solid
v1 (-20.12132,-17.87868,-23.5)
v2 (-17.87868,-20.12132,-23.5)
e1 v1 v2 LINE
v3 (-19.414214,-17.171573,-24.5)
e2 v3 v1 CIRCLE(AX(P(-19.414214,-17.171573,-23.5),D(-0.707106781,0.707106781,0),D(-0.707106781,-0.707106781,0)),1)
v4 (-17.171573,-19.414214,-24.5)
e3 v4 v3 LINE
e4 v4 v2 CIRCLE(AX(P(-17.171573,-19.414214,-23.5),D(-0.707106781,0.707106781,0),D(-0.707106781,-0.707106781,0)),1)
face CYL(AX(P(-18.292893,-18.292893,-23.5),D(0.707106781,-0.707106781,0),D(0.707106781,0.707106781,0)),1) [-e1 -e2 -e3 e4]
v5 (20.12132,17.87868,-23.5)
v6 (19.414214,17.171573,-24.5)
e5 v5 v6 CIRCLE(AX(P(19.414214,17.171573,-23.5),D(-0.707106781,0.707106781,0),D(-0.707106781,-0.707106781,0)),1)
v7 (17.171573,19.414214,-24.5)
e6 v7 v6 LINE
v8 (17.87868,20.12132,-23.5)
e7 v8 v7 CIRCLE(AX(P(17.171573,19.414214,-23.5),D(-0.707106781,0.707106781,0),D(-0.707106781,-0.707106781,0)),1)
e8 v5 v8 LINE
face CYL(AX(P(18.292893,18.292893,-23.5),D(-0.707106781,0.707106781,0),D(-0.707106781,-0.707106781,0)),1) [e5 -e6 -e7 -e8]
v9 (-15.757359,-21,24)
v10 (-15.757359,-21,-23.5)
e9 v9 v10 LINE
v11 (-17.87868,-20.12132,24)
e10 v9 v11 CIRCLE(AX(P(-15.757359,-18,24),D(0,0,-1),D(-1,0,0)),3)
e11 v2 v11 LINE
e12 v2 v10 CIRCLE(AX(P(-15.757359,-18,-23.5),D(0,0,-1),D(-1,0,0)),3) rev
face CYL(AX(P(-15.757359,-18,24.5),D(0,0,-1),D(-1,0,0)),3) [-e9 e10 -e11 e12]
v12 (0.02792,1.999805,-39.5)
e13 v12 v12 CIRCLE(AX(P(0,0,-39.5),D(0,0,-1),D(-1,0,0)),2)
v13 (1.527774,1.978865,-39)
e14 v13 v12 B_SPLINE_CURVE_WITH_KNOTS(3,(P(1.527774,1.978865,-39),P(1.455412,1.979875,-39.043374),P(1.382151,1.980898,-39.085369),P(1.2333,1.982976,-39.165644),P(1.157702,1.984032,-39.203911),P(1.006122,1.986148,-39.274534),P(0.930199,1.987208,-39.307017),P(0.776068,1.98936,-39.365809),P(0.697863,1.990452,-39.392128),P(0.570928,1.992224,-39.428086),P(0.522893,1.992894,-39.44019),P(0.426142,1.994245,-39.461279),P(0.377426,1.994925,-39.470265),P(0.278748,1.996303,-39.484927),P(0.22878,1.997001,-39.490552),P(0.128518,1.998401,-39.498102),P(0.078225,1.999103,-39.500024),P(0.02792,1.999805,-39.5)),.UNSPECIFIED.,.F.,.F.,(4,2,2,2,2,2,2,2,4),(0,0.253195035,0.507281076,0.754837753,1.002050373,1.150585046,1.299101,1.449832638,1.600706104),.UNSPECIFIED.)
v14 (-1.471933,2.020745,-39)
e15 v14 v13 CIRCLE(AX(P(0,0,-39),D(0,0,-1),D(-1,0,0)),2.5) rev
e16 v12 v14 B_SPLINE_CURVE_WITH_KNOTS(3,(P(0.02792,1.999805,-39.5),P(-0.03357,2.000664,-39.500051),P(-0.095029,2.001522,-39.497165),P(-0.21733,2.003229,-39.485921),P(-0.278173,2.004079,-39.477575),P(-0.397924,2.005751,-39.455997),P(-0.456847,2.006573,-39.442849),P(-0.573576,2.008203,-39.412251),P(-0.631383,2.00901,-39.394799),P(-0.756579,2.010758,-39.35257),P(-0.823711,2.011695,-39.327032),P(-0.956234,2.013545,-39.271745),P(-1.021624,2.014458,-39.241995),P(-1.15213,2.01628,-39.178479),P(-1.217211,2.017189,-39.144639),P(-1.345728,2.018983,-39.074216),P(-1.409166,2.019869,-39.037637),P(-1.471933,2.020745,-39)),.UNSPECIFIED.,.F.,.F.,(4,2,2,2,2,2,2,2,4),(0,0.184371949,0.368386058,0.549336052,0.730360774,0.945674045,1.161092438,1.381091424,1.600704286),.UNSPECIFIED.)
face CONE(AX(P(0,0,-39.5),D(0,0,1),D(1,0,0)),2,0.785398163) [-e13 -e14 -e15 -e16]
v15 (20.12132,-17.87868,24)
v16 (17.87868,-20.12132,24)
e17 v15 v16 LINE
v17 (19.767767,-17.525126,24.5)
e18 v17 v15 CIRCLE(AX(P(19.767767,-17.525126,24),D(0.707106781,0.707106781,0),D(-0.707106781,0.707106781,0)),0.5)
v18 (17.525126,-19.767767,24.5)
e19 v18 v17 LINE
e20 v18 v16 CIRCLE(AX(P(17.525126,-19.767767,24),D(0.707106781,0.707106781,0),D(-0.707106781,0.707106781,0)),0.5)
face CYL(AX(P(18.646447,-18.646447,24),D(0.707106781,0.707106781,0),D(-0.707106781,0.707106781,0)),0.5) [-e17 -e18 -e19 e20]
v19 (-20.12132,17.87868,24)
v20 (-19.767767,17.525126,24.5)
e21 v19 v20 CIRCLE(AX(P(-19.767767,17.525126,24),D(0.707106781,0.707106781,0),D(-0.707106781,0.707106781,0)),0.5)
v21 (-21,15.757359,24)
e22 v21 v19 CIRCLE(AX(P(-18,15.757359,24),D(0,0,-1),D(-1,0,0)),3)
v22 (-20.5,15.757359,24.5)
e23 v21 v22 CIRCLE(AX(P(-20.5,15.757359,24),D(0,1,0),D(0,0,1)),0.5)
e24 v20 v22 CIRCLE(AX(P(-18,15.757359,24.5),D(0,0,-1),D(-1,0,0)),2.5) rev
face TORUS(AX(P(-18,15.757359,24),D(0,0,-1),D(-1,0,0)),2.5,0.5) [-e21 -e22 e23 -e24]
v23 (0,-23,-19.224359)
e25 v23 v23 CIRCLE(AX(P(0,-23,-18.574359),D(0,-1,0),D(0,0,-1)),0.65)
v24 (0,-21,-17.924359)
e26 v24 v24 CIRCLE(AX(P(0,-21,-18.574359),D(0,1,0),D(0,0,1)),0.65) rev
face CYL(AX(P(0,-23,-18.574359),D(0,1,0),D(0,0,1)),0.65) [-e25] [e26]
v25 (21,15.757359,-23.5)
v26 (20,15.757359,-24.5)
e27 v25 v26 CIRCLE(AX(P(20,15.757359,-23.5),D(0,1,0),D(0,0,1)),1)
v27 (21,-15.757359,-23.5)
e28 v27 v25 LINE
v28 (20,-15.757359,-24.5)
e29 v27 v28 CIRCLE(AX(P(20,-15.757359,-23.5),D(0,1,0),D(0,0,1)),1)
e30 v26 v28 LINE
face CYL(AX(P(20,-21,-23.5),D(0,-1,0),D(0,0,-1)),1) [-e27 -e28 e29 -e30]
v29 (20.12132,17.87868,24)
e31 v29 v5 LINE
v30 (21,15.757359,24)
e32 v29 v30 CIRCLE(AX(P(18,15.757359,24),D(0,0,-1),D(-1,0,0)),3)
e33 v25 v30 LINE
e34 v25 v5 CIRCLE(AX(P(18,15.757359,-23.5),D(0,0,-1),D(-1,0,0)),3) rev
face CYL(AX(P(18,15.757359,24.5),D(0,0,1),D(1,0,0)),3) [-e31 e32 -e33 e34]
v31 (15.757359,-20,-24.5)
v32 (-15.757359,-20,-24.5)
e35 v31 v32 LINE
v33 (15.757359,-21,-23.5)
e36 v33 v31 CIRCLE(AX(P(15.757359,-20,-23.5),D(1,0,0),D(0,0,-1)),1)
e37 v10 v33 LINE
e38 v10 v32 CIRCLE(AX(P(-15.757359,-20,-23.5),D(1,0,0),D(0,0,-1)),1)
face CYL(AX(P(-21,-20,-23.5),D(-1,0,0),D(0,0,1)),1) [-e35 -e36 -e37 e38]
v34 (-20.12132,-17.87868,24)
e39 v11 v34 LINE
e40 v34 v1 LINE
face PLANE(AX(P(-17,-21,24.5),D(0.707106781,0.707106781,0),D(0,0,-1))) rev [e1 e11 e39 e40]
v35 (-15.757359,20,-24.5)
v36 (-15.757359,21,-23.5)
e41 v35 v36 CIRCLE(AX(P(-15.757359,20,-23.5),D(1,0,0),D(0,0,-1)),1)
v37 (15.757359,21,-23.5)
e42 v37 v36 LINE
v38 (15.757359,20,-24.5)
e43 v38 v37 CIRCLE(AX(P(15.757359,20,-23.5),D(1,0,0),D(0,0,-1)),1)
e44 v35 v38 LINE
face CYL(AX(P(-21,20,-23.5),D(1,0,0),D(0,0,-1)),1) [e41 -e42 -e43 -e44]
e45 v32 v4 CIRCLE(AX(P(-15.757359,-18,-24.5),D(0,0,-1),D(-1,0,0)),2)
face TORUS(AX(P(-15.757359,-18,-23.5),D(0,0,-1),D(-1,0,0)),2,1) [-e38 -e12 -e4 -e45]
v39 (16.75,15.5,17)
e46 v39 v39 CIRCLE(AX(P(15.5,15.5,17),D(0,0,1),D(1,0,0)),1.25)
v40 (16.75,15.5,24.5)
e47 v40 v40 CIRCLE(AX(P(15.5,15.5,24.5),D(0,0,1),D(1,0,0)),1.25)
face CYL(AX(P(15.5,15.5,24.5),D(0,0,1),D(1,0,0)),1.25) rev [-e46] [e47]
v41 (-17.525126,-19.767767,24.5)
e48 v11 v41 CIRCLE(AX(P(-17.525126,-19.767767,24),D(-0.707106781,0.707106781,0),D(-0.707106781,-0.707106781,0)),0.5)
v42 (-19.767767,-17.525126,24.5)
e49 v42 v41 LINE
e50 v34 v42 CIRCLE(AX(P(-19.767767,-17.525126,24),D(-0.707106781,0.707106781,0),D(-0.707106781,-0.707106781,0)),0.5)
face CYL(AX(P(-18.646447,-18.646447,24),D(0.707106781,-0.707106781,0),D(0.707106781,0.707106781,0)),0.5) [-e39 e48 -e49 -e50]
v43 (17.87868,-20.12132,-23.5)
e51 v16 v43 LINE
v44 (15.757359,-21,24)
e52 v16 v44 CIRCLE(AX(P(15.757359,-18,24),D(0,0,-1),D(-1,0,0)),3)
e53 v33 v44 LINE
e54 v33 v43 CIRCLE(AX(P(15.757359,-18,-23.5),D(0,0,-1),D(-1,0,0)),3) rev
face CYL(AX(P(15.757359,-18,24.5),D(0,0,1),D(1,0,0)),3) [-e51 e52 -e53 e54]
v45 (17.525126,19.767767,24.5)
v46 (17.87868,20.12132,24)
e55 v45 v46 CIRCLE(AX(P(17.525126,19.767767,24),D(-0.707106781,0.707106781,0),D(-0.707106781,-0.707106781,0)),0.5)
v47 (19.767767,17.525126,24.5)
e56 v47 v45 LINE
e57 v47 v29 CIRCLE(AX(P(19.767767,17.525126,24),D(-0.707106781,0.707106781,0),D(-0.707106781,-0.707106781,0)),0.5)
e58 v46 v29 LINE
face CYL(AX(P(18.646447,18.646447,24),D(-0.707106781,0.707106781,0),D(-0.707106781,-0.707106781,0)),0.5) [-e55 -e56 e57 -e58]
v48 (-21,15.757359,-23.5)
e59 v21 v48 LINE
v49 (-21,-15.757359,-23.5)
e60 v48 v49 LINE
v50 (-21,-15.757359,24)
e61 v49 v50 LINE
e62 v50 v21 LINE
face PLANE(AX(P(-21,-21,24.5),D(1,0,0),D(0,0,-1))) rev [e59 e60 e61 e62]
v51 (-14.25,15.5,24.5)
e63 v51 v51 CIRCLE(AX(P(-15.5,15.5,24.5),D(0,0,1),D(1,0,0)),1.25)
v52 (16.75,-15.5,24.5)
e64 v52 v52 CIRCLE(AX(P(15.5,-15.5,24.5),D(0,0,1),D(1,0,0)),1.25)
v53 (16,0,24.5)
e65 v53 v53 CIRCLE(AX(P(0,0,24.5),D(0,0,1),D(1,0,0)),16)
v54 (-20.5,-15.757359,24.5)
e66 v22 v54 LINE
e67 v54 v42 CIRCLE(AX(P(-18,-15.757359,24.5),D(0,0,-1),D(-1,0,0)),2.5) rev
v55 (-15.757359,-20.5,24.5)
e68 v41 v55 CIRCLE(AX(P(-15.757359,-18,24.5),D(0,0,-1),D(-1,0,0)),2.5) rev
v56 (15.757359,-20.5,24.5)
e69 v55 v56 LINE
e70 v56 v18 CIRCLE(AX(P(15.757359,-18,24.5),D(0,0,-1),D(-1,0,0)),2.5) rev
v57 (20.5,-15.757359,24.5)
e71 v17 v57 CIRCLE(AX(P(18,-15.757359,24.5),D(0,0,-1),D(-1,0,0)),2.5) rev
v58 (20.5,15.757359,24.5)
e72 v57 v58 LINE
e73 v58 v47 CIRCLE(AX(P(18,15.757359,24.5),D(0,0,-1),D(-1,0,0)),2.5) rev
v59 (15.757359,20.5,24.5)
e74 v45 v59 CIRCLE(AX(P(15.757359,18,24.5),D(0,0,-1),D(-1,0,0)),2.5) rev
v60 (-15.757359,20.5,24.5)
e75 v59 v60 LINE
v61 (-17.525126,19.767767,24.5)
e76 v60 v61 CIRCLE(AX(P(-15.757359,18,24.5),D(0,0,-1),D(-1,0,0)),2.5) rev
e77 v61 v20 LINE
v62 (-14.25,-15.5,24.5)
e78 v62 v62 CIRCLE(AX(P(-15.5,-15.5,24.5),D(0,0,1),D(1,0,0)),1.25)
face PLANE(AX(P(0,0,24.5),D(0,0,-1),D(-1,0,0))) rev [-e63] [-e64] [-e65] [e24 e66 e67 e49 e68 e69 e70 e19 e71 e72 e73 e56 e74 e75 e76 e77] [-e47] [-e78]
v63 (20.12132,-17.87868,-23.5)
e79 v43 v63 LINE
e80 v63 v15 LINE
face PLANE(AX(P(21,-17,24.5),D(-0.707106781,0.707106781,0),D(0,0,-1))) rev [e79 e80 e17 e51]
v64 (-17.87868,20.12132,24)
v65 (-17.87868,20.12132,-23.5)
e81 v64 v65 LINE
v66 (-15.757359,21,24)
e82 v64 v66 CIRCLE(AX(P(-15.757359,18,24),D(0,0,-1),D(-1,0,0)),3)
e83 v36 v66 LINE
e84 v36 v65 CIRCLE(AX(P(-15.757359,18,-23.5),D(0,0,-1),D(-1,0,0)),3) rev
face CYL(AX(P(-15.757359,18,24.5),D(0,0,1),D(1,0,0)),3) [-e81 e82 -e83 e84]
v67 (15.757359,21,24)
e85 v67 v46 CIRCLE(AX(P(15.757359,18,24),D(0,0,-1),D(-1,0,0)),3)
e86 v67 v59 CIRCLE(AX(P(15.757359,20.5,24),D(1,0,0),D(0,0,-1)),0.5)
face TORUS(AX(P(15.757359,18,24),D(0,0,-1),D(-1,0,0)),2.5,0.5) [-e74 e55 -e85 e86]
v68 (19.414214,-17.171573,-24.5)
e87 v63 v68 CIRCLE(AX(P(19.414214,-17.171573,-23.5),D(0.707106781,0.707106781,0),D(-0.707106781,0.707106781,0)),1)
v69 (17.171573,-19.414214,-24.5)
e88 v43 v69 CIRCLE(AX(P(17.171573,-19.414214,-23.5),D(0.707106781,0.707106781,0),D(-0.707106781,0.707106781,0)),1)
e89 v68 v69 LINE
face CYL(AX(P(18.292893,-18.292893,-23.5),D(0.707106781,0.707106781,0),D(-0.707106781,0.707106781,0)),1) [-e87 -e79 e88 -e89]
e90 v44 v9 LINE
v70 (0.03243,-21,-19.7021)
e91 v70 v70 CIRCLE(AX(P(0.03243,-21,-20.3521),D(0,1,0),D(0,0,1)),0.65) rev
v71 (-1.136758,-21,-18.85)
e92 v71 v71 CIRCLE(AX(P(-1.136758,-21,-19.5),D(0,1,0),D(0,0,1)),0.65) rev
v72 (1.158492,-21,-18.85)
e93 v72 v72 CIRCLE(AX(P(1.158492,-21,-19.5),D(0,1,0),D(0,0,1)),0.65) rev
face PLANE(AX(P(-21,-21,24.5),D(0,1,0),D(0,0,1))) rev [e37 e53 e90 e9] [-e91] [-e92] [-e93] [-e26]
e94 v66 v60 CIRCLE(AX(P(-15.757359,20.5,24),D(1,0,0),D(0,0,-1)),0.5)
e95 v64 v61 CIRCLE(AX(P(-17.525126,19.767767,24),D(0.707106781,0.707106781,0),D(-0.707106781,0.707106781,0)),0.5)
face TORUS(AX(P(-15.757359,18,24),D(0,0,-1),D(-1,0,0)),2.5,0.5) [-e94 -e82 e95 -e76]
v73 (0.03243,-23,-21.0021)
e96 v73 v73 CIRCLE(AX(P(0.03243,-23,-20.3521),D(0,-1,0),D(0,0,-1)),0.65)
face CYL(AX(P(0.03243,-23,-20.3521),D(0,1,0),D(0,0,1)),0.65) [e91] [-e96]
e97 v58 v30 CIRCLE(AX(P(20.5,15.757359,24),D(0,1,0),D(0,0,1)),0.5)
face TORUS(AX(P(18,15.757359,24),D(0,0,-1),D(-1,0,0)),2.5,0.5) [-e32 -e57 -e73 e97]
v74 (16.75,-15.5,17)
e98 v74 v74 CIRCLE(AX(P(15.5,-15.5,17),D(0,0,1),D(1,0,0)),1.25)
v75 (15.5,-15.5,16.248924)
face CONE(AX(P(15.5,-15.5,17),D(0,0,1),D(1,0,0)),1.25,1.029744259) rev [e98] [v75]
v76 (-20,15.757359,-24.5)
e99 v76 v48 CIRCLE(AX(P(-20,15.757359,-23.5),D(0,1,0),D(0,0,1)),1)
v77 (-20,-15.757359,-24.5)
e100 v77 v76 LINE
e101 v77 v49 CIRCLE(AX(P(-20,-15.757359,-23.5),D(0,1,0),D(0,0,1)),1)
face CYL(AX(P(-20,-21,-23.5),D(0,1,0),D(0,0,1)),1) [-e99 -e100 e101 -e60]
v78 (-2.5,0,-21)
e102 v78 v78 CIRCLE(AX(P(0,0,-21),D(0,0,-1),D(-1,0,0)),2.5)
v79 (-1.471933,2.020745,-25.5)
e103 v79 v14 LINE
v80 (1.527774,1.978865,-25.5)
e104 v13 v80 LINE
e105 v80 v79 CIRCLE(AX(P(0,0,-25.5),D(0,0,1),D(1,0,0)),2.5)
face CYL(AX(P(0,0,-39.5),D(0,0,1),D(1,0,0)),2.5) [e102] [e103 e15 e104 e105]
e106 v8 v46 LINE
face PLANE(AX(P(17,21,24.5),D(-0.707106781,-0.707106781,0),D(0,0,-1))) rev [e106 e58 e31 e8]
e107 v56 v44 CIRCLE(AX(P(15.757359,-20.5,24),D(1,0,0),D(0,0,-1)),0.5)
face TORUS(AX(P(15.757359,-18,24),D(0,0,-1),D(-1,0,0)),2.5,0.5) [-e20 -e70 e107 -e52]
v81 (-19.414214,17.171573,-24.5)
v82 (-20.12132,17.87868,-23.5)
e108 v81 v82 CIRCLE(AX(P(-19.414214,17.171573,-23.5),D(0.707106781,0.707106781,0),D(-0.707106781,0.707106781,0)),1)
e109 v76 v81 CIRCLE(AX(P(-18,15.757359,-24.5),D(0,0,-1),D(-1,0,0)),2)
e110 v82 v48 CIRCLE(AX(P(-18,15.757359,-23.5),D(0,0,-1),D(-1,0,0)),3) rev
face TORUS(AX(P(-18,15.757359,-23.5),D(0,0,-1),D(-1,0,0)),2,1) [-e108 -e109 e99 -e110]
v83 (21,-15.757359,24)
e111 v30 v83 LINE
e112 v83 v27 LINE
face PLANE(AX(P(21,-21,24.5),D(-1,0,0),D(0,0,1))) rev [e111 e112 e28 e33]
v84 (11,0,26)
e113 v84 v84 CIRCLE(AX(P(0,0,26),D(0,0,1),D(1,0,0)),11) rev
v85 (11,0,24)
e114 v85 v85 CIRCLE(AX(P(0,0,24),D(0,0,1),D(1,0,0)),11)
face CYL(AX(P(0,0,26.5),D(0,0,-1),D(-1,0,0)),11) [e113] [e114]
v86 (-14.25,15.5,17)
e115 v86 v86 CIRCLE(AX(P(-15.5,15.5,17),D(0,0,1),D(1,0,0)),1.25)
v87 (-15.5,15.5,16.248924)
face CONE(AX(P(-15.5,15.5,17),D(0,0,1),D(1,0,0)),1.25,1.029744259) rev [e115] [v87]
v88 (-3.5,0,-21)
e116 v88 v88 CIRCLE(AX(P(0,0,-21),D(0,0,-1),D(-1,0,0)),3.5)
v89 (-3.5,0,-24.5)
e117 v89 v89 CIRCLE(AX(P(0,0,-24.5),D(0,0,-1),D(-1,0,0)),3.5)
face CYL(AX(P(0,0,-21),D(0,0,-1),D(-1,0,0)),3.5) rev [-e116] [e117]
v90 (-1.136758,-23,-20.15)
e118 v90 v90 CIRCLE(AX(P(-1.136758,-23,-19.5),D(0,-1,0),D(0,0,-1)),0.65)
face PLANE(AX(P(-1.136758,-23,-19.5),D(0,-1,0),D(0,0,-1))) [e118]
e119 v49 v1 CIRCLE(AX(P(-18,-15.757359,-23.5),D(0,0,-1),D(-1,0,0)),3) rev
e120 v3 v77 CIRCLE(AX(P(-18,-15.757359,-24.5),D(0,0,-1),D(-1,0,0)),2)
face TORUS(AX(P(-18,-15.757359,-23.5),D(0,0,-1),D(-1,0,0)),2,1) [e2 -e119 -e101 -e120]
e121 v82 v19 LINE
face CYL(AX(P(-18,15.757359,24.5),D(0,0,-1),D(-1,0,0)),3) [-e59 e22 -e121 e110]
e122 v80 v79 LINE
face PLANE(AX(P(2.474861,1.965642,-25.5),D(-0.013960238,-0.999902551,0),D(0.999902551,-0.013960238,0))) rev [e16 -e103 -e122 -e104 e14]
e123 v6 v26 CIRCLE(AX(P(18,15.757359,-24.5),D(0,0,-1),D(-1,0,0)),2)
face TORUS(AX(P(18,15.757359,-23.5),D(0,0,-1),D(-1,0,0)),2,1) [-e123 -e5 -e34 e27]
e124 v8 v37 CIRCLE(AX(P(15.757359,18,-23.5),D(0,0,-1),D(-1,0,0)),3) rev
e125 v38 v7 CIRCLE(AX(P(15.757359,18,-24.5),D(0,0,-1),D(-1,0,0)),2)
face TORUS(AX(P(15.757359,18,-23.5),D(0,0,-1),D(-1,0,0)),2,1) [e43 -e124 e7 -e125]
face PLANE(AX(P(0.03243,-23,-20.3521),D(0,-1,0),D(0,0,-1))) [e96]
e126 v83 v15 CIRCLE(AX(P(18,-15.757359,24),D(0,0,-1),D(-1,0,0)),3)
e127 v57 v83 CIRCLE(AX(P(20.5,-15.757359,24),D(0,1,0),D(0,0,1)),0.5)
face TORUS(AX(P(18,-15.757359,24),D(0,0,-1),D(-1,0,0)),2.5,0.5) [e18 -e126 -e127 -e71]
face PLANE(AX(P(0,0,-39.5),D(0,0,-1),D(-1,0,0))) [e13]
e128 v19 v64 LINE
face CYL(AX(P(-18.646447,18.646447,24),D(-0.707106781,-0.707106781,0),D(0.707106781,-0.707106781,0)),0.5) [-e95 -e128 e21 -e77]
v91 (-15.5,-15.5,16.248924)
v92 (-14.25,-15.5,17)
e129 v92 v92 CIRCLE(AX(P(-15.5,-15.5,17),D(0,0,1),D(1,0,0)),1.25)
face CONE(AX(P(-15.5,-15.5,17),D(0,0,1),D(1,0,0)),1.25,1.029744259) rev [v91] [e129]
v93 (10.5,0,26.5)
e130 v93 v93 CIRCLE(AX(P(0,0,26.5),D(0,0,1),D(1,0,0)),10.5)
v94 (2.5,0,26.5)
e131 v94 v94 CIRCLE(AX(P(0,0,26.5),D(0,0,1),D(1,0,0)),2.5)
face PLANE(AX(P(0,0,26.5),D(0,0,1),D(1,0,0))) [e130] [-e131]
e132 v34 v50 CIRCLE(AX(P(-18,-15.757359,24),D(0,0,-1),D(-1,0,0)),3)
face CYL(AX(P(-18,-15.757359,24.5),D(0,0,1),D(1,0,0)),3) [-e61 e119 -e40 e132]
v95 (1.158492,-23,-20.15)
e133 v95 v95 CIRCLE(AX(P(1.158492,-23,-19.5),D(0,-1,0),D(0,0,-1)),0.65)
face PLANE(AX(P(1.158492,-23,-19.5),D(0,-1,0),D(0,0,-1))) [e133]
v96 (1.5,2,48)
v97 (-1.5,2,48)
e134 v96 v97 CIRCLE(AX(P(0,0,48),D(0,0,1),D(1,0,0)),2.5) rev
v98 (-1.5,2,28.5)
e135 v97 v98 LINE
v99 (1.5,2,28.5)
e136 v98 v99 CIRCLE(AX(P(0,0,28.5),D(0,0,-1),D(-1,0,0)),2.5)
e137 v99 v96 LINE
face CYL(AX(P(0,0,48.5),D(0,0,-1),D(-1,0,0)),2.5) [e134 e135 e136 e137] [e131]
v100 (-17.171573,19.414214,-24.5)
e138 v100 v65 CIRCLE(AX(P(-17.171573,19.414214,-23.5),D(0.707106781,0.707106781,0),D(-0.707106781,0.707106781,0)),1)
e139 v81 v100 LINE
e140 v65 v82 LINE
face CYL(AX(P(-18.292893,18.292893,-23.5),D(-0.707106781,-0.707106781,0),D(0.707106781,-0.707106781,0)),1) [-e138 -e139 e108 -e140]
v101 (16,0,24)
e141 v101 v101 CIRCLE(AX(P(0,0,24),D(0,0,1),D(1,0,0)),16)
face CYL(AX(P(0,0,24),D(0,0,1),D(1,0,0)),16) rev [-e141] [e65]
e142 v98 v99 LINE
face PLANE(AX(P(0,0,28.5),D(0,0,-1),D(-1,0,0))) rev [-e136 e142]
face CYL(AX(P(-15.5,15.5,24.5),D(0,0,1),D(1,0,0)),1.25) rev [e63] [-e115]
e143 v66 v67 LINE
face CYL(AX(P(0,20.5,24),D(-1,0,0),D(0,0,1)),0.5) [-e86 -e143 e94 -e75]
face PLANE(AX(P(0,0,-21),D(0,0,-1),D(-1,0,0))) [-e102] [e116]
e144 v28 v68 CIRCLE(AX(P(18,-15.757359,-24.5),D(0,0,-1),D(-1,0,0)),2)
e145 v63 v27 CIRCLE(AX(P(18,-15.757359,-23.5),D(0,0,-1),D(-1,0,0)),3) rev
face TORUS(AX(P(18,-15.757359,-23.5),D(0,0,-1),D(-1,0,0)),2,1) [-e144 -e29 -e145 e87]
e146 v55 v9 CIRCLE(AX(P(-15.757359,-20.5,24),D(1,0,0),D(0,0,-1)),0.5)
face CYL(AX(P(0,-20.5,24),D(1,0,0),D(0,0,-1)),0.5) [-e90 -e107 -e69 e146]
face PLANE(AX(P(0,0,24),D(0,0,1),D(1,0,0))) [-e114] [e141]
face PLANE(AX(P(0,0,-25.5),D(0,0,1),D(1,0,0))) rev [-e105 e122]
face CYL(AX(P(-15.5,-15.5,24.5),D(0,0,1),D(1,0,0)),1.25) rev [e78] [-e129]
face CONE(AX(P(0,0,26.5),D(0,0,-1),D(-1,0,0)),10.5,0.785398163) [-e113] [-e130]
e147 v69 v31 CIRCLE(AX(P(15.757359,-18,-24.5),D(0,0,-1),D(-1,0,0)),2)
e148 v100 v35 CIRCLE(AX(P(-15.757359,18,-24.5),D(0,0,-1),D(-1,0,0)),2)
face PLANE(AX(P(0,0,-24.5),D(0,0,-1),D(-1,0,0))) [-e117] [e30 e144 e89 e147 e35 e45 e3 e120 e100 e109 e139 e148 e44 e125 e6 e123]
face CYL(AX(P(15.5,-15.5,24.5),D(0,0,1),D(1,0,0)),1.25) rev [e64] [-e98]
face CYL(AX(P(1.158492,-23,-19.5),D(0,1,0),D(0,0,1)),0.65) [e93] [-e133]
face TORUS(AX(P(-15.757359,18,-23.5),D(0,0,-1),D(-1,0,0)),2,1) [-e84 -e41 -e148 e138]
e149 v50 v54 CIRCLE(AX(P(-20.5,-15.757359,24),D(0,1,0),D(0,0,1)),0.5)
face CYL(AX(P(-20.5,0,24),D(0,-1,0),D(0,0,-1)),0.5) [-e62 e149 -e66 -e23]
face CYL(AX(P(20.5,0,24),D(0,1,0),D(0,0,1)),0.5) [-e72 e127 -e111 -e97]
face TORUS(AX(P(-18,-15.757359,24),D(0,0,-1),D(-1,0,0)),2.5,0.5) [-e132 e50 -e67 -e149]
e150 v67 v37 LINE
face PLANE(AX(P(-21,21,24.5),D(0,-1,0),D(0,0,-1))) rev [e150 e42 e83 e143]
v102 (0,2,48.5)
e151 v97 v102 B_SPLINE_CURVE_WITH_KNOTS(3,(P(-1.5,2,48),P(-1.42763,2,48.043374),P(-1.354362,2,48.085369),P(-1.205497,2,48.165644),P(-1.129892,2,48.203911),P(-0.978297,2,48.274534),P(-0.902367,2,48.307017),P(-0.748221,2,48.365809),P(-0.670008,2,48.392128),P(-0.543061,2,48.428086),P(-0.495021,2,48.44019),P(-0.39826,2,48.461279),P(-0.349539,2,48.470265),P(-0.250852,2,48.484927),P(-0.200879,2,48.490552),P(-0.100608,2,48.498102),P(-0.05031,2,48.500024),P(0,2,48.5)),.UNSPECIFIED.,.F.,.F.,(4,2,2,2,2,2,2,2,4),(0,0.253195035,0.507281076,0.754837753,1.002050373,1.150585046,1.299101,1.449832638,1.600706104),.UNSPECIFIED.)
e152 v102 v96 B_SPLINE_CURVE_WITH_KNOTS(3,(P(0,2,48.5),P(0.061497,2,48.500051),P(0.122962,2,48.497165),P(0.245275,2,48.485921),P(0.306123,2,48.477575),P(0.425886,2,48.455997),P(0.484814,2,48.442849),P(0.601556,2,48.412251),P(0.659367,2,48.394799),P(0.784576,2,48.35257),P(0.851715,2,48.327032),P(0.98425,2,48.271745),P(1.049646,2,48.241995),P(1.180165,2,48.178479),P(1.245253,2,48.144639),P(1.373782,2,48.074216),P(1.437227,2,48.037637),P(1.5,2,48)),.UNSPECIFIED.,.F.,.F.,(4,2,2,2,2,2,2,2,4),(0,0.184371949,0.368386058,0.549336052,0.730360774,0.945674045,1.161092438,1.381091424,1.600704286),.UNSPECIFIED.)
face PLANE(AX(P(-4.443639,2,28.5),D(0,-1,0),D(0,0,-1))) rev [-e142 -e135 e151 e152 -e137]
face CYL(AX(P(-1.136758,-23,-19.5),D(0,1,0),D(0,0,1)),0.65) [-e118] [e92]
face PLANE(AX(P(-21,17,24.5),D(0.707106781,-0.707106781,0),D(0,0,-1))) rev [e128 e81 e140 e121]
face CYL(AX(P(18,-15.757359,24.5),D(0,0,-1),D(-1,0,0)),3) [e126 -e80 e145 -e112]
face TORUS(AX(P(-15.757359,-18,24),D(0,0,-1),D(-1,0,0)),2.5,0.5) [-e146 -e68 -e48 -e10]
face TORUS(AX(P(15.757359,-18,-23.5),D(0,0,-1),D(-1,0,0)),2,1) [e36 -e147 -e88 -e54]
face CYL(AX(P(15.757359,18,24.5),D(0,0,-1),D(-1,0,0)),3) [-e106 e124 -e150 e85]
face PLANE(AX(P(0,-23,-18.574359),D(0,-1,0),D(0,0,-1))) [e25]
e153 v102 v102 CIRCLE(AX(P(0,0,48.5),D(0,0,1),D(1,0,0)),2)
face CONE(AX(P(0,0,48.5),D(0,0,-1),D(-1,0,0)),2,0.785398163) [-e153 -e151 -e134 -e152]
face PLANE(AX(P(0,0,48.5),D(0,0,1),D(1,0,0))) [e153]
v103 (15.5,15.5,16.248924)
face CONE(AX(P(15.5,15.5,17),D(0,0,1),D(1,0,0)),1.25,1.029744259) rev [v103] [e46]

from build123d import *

# Parameters (mm, degrees)
SKETCH1_W           = 42
SKETCH1_H           = 42
BOSS_EXTRUDE1_DEPTH = 24.5
CHAMFER1_SIZE       = 4
SKETCH2_R           = 11
BOSS_EXTRUDE2_DEPTH = 2
CUT_EXTRUDE1_START  = -0.5
SKETCH3_R           = 16
SKETCH3_R_2         = 11
CUT_EXTRUDE1_DEPTH  = 0.5
SKETCH4_R           = 2.5
BOSS_EXTRUDE3_DEPTH = 22
SKETCH5_W           = 10.364275964
SKETCH5_H           = 1.526028363
CUT_EXTRUDE2_DEPTH  = 20
CIRPATTERN1_COUNT   = 4
FILLET1_R           = 3
CHAMFER2_SIZE       = 0.5
FILLET2_R           = 1
FILLET3_R           = 0.5
SKETCH8_R           = 0.65
BOSS_EXTRUDE4_DEPTH = 2
SKETCH9_R           = 3.5
CUT_EXTRUDE3_DEPTH  = 3.5
BOSS_EXTRUDE5_START = 18.5
SKETCH10_R          = 2.5
BOSS_EXTRUDE5_DEPTH = 18.5
CUT_EXTRUDE4_DEPTH  = 14
CHAMFER3_SIZE       = 0.5


with BuildPart() as part:
    # Sketch1 → Boss-Extrude1 (new, symmetric)
    with BuildSketch(Plane.XY):
        Rectangle(SKETCH1_W, SKETCH1_H)
    extrude(amount=BOSS_EXTRUDE1_DEPTH, both=True)

    # Chamfer1
    chamfer1_edges = [part.edges().sort_by_distance(p)[0] for p in [
        (21, -21, 0),
        (-21, -21, 0),
        (-21, 21, 0),
        (21, 21, 0),
    ]]
    chamfer(chamfer1_edges, length=CHAMFER1_SIZE)

    # Sketch2 → Boss-Extrude2 (add)
    with BuildSketch(Plane.XY.offset(24.5)):
        with Locations(Location((0, 0, 0), (0, 0, 180))):
            Circle(SKETCH2_R)
    extrude(amount=BOSS_EXTRUDE2_DEPTH)

    # Sketch3 → Cut-Extrude1 (cut)
    with BuildSketch(Plane.XY.offset(24.5).offset(CUT_EXTRUDE1_START)):
        Circle(SKETCH3_R)
        Circle(SKETCH3_R_2, mode=Mode.SUBTRACT)
    extrude(amount=CUT_EXTRUDE1_DEPTH, mode=Mode.SUBTRACT)

    # Sketch4 → Boss-Extrude3 (add)
    with BuildSketch(Plane.XY.offset(26.5)):
        Circle(SKETCH4_R)
    extrude(amount=BOSS_EXTRUDE3_DEPTH)

    # Sketch5 → Cut-Extrude2 (cut)
    with BuildSketch(Plane.XY.offset(48.5)):
        with Locations((0.738499094, 2.763014181)):
            Rectangle(SKETCH5_W, SKETCH5_H)
    extrude(amount=-CUT_EXTRUDE2_DEPTH, mode=Mode.SUBTRACT)

    # Sketch7 → M3x0.5 Tapped Hole1 (revolve, cut)
    with BuildSketch(Plane(origin=(-15.5, 15.5, 24.5), x_dir=(0, -1, 0), z_dir=(1, 0, 0))):
        Polygon((0, 0), (0, 8.251075774), (1.25, 7.5), (1.25, 0), align=None)
    m3x0_5_tapped_hole1 = revolve(axis=Axis((-15.5, 15.5, 30.85), (0, 0, -1)), mode=Mode.SUBTRACT)

    # CirPattern1: M3x0.5 Tapped Hole1 ×4 about axis
    cirpattern1_axis = Axis((0, 0, 0), (0, 0, 1))
    for i in range(1, CIRPATTERN1_COUNT):
        add(m3x0_5_tapped_hole1.rotate(cirpattern1_axis, i * 360 / CIRPATTERN1_COUNT), mode=Mode.SUBTRACT)

    # Fillet1
    fillet1_edges = [part.edges().sort_by_distance(p)[0] for p in [
        (17, -21, 0),
        (-17, -21, 0),
        (-21, 17, 0),
        (-21, -17, 0),
        (21, 17, 0),
        (21, -17, 0),
        (17, 21, 0),
        (-17, 21, 0),
    ]]
    fillet(fillet1_edges, radius=FILLET1_R)

    # Chamfer2
    chamfer2_edges = [part.edges().sort_by_distance(p)[0] for p in [
        (-1.118033989, -2.236067977, 48.5),
        (11, 0, 26.5),
    ]]
    chamfer(chamfer2_edges, length=CHAMFER2_SIZE - 0.0001)  # a hair under: the kernel refuses the full size

    # Fillet2
    fillet2_edges = [part.edges().sort_by_distance(p)[0] for p in [
        (-19, -19, -24.5),
        (0, -21, -24.5),
        (-19, 19, -24.5),
        (0, 21, -24.5),
        (19, 19, -24.5),
        (21, 0, -24.5),
        (19, -19, -24.5),
        (-16.90540961, 20.771638598, -24.5),
        (-20.771638598, 16.90540961, -24.5),
        (16.90540961, 20.771638598, -24.5),
        (20.771638598, 16.90540961, -24.5),
        (20.771638598, -16.90540961, -24.5),
        (16.90540961, -20.771638598, -24.5),
        (-16.90540961, -20.771638598, -24.5),
        (-20.771638598, -16.90540961, -24.5),
        (-21, 0, -24.5),
    ]]
    fillet(fillet2_edges, radius=FILLET2_R)

    # Fillet3
    fillet3_edges = [part.edges().sort_by_distance(p)[0] for p in [
        (-16.90540961, 20.771638598, 24.5),
        (-20.771638598, 16.90540961, 24.5),
        (16.90540961, 20.771638598, 24.5),
        (20.771638598, 16.90540961, 24.5),
        (20.771638598, -16.90540961, 24.5),
        (16.90540961, -20.771638598, 24.5),
        (-16.90540961, -20.771638598, 24.5),
        (-20.771638598, -16.90540961, 24.5),
        (-21, 0, 24.5),
        (-19, -19, 24.5),
        (0, -21, 24.5),
        (19, -19, 24.5),
        (21, 0, 24.5),
        (19, 19, 24.5),
        (0, 21, 24.5),
        (-19, 19, 24.5),
    ]]
    fillet(fillet3_edges, radius=FILLET3_R)

    # Sketch8 → Boss-Extrude4 (add)
    with BuildSketch(Plane.XZ.offset(21)):
        with Locations(Location((0, -18.574359193, 0), (0, 0, 90))):
            Circle(SKETCH8_R)
        with Locations(Location((1.158492333, -19.5, 0), (0, 0, 90))):
            Circle(SKETCH8_R)
        with Locations(Location((0.032430158, -20.352099903, 0), (0, 0, 90))):
            Circle(SKETCH8_R)
        with Locations(Location((-1.136757802, -19.5, 0), (0, 0, 90))):
            Circle(SKETCH8_R)
    extrude(amount=BOSS_EXTRUDE4_DEPTH)

    # Sketch9 → Cut-Extrude3 (cut)
    with BuildSketch(Plane(origin=(0, 0, -24.5), x_dir=(-1, 0, 0), z_dir=(0, 0, -1))):
        Circle(SKETCH9_R)
    extrude(amount=-CUT_EXTRUDE3_DEPTH, mode=Mode.SUBTRACT)

    # Sketch10 → Boss-Extrude5 (add)
    with BuildSketch(Plane(origin=(0, 0, -21), x_dir=(-1, 0, 0), z_dir=(0, 0, -1)).offset(BOSS_EXTRUDE5_START)):
        with Locations(Location((0, 0, 0), (0, 0, 53.130102354))):
            Circle(SKETCH10_R)
    extrude(amount=-BOSS_EXTRUDE5_DEPTH)

    # Sketch11 → Cut-Extrude4 (cut)
    with BuildSketch(Plane(origin=(0, 0, -39.5), x_dir=(-1, 0, 0), z_dir=(0, 0, -1))):
        Polygon((-2.474861219, 1.965641899), (2.844080947, 2.039902832), (0.230053947, 6.606484891), align=None)
    extrude(amount=-CUT_EXTRUDE4_DEPTH, mode=Mode.SUBTRACT)

    # Chamfer3
    chamfer3_edges = [part.edges().sort_by_distance(p)[0] for p in [
        (-0.017450722, -2.499939094, -39.5),
    ]]
    chamfer(chamfer3_edges, length=CHAMFER3_SIZE - 0.0001)  # a hair under: the kernel refuses the full size


solid = part.part
